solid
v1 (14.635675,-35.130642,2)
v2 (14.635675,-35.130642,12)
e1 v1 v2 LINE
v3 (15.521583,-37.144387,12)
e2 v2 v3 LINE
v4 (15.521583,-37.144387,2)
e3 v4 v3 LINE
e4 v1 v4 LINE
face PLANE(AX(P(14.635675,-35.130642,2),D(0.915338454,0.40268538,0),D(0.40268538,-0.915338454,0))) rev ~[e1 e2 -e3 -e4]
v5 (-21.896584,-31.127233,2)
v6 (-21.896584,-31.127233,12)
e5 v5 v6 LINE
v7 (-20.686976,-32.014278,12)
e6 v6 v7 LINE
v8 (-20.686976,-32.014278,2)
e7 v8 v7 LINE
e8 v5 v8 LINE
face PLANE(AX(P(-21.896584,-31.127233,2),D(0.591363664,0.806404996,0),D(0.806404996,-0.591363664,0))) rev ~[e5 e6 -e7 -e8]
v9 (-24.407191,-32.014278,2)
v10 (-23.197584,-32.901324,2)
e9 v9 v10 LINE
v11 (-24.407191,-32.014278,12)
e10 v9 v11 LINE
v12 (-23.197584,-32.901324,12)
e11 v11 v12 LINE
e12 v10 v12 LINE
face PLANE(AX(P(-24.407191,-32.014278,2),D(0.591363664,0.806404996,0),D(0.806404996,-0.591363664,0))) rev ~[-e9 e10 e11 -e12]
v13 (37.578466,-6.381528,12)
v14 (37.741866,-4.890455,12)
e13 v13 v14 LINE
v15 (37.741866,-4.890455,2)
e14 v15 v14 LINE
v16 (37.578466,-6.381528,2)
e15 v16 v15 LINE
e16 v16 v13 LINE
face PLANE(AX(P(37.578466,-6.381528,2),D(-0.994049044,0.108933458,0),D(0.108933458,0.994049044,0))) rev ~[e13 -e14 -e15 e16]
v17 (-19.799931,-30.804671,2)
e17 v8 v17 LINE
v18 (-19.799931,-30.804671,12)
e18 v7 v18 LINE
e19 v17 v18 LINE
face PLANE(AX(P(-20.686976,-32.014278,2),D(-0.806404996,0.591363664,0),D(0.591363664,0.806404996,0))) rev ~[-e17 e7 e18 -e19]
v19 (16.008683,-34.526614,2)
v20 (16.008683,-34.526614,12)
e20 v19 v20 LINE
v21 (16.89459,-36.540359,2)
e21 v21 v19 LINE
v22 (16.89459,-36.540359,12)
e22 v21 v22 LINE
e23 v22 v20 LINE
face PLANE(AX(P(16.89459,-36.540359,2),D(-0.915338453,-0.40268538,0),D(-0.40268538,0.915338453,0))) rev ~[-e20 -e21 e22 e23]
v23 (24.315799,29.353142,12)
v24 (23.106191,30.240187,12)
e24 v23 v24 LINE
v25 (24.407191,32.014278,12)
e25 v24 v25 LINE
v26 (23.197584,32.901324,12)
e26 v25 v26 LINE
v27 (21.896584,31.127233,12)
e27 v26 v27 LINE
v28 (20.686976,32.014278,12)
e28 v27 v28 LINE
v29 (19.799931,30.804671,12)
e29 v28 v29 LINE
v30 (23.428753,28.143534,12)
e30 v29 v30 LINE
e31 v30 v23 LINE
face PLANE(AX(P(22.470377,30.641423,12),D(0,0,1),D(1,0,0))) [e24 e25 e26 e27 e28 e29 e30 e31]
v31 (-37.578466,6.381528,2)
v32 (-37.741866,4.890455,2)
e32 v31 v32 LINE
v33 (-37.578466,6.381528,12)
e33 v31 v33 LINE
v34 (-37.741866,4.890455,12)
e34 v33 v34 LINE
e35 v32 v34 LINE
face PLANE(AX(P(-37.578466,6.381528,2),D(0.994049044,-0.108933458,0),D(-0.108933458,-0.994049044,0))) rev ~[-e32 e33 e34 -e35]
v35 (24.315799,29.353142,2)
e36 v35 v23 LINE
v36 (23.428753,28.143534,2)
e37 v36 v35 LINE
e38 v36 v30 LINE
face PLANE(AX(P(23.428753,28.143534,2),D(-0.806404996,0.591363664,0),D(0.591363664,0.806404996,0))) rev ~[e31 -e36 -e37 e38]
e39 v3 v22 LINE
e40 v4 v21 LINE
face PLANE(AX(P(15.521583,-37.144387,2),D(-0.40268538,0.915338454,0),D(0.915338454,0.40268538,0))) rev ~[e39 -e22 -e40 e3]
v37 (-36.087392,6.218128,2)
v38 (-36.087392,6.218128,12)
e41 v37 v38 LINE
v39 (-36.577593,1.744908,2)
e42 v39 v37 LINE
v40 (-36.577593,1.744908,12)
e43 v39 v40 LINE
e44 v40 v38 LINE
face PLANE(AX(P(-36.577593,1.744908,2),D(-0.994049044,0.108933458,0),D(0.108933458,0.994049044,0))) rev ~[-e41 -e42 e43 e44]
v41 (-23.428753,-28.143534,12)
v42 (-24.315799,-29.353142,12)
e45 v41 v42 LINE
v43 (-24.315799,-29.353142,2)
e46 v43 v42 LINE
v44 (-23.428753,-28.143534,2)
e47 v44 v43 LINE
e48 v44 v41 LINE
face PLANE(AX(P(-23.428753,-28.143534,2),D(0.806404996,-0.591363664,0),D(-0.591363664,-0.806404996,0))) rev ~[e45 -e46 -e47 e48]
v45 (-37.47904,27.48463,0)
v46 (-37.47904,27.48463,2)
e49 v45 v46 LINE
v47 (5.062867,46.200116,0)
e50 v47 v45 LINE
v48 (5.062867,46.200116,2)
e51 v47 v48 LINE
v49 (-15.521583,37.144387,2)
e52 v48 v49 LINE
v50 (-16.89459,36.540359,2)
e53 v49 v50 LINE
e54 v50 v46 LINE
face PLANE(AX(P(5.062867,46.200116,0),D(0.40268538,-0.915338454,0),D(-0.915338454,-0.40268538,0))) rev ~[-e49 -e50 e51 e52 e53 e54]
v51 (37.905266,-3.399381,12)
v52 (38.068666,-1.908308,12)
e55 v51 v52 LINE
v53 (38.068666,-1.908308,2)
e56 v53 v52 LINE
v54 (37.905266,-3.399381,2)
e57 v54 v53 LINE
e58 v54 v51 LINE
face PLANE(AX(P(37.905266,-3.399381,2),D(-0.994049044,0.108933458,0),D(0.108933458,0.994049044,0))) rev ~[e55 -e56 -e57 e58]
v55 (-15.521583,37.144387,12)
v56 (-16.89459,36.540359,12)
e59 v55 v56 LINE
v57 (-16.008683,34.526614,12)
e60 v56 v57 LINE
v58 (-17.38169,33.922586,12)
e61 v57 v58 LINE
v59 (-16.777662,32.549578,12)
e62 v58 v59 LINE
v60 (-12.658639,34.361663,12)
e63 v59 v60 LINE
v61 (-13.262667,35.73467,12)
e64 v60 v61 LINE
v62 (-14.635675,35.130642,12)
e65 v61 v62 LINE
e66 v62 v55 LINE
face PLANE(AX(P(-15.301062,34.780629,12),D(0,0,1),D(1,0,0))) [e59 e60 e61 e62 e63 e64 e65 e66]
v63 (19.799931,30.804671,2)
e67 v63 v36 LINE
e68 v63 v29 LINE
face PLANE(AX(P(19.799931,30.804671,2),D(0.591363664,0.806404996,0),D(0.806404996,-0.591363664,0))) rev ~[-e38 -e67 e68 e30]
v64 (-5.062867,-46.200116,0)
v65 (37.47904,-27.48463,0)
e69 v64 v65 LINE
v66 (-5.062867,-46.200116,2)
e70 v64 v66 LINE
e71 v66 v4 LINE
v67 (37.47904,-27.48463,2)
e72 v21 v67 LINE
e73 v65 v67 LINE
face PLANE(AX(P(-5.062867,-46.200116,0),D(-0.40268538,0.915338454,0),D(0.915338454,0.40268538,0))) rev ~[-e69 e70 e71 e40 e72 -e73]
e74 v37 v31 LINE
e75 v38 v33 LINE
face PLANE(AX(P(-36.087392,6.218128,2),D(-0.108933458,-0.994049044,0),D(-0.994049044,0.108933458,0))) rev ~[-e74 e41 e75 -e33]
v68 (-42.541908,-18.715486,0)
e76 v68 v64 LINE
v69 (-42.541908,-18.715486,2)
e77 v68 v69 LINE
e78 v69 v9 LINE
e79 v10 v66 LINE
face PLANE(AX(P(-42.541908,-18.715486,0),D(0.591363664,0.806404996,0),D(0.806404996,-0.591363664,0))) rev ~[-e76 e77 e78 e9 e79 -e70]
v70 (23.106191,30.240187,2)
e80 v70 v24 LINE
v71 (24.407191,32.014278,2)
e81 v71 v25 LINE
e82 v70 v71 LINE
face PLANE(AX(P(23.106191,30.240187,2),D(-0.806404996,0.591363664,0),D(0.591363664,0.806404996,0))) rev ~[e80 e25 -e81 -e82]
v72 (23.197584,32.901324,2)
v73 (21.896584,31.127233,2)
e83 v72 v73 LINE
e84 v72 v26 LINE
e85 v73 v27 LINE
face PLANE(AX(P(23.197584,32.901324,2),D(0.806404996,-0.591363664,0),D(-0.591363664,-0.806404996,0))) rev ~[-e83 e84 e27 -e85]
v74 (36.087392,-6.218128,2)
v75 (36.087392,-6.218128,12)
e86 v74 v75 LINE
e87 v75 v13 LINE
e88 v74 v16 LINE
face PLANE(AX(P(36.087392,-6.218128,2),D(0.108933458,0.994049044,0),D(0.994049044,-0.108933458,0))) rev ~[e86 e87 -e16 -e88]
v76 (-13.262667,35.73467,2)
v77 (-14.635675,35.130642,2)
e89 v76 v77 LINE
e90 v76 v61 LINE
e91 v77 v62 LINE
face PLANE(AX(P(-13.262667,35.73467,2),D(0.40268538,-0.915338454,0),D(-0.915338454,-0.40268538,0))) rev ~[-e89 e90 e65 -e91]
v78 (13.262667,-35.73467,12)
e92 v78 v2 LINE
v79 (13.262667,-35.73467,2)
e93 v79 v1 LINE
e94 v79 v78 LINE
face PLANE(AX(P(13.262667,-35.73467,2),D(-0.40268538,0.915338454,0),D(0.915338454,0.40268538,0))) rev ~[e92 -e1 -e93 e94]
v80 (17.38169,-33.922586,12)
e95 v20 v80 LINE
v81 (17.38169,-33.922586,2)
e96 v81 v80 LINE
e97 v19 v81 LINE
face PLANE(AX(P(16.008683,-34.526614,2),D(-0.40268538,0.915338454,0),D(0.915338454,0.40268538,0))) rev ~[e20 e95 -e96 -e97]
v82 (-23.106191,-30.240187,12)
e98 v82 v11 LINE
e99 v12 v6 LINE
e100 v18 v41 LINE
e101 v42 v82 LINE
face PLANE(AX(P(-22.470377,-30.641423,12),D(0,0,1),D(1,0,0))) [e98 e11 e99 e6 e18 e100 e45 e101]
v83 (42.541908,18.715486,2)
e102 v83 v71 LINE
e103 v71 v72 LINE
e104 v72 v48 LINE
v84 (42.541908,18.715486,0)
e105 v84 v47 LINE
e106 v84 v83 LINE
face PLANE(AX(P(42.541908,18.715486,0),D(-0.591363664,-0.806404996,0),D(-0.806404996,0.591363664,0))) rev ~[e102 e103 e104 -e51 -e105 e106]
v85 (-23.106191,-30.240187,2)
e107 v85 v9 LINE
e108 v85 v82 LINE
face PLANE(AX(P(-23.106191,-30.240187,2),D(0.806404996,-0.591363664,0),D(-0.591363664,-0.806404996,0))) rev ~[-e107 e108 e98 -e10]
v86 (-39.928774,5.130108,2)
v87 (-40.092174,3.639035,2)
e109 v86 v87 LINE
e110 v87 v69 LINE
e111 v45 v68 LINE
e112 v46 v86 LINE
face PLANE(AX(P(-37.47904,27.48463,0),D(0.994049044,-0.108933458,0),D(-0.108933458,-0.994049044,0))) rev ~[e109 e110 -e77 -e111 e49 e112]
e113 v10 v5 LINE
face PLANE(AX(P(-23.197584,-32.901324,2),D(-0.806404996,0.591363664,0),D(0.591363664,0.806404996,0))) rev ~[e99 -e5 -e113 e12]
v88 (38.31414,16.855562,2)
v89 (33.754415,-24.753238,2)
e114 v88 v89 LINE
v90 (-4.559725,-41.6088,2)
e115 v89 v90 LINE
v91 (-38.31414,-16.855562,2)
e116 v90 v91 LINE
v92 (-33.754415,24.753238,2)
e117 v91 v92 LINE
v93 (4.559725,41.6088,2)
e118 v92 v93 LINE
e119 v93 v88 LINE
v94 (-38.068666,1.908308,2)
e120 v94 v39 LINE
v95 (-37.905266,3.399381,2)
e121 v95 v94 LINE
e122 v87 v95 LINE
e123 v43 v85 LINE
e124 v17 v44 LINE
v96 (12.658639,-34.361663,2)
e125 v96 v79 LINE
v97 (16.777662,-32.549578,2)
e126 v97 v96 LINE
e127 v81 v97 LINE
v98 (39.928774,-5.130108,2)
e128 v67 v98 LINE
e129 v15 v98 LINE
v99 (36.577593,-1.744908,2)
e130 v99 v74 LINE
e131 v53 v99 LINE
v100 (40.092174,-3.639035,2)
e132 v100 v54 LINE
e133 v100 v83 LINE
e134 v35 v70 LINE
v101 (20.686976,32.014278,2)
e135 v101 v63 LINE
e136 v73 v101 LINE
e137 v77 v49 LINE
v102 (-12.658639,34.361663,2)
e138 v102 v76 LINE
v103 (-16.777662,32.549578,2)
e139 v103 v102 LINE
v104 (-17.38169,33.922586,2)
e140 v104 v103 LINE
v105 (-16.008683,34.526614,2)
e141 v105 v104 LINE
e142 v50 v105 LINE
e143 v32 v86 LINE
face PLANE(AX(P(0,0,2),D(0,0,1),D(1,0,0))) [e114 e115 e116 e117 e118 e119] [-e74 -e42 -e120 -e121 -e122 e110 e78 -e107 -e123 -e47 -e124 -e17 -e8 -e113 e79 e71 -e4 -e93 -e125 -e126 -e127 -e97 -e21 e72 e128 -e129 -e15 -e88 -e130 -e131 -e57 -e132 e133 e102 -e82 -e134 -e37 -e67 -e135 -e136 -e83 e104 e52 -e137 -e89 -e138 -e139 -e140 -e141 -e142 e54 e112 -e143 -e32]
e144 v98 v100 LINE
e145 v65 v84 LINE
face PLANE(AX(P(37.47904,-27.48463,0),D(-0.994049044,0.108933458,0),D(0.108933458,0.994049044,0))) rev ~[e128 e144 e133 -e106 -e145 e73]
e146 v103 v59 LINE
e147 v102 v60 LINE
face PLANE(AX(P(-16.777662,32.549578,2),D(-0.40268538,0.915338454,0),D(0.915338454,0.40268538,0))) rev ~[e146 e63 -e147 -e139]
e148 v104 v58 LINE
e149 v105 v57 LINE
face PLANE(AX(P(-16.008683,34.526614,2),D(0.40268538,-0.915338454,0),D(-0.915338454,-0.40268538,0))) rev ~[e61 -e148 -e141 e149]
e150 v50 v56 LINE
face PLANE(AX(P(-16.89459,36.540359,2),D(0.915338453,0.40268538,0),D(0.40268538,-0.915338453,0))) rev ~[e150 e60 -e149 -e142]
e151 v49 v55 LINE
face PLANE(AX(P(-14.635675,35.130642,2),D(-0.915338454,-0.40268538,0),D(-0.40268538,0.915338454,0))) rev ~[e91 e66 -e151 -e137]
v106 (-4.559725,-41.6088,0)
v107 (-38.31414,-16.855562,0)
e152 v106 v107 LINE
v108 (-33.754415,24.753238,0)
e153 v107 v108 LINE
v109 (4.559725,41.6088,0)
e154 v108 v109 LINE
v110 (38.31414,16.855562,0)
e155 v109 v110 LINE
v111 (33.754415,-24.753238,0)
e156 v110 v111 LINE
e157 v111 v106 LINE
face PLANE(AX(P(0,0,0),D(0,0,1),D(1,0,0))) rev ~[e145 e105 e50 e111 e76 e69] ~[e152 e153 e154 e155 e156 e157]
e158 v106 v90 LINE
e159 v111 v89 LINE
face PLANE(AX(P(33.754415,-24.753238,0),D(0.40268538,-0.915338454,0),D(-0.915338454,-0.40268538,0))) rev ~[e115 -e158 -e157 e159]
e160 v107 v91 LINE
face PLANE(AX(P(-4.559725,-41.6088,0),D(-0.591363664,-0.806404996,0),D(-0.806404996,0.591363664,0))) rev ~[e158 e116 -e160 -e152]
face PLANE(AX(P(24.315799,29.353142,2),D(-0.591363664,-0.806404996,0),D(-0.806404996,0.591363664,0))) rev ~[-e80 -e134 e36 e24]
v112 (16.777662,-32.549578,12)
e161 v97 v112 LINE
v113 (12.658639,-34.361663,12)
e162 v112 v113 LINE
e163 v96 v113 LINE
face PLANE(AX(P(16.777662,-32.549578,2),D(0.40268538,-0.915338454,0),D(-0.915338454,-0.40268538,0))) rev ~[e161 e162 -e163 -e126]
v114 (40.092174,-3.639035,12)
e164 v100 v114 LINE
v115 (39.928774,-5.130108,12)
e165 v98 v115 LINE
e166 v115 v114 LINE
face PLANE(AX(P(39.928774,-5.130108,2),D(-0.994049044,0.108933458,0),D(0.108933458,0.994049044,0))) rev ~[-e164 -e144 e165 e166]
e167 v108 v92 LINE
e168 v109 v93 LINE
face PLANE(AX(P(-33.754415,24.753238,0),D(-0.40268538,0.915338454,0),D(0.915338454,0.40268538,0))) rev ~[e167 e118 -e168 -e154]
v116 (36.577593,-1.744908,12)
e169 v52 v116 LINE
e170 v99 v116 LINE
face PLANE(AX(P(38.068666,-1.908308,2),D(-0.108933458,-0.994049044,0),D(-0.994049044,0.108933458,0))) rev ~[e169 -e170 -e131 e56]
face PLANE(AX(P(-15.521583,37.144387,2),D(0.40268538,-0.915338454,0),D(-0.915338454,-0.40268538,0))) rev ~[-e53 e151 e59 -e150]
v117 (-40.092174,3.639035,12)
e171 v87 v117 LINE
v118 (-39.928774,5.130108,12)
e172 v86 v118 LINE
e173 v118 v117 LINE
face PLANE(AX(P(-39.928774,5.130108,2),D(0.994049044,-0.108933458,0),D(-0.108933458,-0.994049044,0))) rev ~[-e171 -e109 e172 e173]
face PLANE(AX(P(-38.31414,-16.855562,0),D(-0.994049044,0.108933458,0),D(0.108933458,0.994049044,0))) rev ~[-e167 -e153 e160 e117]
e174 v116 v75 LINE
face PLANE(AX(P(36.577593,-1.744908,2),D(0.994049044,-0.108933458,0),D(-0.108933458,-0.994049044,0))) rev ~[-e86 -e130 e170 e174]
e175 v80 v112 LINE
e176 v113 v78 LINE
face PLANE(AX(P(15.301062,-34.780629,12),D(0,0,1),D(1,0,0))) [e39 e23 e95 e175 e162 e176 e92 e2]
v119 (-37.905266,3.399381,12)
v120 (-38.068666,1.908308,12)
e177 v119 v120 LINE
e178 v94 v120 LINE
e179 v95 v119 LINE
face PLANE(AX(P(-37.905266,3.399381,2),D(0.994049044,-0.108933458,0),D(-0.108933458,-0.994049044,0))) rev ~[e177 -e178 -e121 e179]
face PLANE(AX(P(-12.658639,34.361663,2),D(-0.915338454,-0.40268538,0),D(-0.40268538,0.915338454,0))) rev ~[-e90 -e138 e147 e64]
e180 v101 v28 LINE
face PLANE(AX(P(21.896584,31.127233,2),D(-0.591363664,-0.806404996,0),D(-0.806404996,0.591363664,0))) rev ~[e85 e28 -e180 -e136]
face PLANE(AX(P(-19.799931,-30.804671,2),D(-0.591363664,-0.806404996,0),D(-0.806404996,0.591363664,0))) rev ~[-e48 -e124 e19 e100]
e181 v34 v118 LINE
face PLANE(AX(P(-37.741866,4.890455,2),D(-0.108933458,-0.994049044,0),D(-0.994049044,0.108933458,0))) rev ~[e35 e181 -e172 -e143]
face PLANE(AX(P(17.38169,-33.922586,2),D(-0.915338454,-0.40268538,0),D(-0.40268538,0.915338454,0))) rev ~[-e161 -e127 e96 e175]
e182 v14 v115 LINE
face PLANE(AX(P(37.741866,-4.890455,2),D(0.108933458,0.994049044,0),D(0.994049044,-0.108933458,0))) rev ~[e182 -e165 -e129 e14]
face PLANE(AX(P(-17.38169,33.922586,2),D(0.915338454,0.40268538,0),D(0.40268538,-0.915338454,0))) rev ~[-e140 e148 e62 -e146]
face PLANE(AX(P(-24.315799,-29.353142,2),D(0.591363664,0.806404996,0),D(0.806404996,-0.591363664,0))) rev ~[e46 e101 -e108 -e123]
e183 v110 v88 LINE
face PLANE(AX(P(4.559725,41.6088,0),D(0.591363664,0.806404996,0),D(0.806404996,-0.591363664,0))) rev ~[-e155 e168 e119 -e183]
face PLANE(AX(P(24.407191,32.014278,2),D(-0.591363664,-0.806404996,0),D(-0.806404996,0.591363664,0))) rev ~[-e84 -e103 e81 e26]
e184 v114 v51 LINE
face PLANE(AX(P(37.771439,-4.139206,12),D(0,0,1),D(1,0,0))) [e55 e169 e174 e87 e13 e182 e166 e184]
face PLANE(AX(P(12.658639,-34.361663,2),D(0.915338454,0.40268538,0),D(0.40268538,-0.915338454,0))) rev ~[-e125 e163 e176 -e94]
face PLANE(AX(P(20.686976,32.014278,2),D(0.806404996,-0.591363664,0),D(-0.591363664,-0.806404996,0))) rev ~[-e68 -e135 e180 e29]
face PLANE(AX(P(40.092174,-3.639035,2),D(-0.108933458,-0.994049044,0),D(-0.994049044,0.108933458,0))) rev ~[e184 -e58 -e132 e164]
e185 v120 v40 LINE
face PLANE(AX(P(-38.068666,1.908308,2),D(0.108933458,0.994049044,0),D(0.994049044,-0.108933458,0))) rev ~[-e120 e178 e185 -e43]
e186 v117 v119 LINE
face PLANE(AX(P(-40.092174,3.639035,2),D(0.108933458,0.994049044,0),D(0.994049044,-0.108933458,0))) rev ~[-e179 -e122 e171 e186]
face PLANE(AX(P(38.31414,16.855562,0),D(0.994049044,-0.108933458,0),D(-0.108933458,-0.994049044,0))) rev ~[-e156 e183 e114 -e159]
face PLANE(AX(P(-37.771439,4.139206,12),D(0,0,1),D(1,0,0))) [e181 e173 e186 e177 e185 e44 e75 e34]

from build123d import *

# Parameters (mm, degrees)
F1_DEPTH = 2
F3_DEPTH = 10


# Not quite as in the source:
# - a feature names something its author has since deleted; it is built from what else it names


with BuildPart() as f1:
    # F0 (on Top) → F1 (new body)
    with BuildSketch(Plane.XY):
        Polygon((-5.0628672683, -46.2001158912), (37.4790403854, -27.4846296159), (42.5419076537, 18.7154862752), (5.0628672683, 46.2001158912), (-37.4790403854, 27.4846296159), (-42.5419076537, -18.7154862752), align=None)
        Polygon((-38.3141404334, -16.8555621733), (-33.7544152539, 24.7532378529), (4.5597251795, 41.6088000262), (38.3141404334, 16.8555621733), (33.7544152539, -24.7532378529), (-4.5597251795, -41.6088000262), align=None, mode=Mode.SUBTRACT)
    extrude(amount=F1_DEPTH)

    # F2 (on face) → F3 (join)
    with BuildSketch(Plane.XY.offset(2)):
        Polygon((-15.5215827184, 37.1443867888), (-16.8945903987, 36.5403587183), (-16.0086825619, 34.5266141206), (-17.3816902422, 33.9225860501), (-16.7776621717, 32.5495783698), (-12.6586391309, 34.3616625813), (-13.2626672014, 35.7346702616), (-14.6356748817, 35.1306421911), align=None)
        Polygon((24.4071912079, 32.0142783355), (23.1975837141, 32.9013238309), (21.8965836541, 31.12723284), (20.6869761604, 32.0142783355), (19.7999306649, 30.8046708417), (23.4287531463, 28.1435343554), (24.3157986417, 29.3531418491), (23.1061911479, 30.2401873446), align=None)
        Polygon((37.7418660296, -4.8904548465), (39.9287739263, -5.1301084533), (40.0921741128, -3.6390348874), (37.905266216, -3.3993812806), (38.0686664025, -1.9083077146), (36.5775928366, -1.7449075281), (36.0873922772, -6.218128226), (37.5784658431, -6.3815284124), align=None)
        Polygon((14.6356748817, -35.1306421911), (15.5215827184, -37.1443867888), (16.8945903987, -36.5403587183), (16.0086825619, -34.5266141206), (17.3816902422, -33.9225860501), (16.7776621717, -32.5495783698), (12.6586391309, -34.3616625813), (13.2626672014, -35.7346702616), align=None)
        Polygon((-23.1061911479, -30.2401873446), (-24.4071912079, -32.0142783355), (-23.1975837141, -32.9013238309), (-21.8965836541, -31.12723284), (-20.6869761604, -32.0142783355), (-19.7999306649, -30.8046708417), (-23.4287531463, -28.1435343554), (-24.3157986417, -29.3531418491), align=None)
        Polygon((-39.9287739263, 5.1301084533), (-40.0921741128, 3.6390348874), (-37.905266216, 3.3993812806), (-38.0686664025, 1.9083077146), (-36.5775928366, 1.7449075281), (-36.0873922772, 6.218128226), (-37.5784658431, 6.3815284124), (-37.7418660296, 4.8904548465), align=None)
    extrude(amount=F3_DEPTH)


solid = f1.part
